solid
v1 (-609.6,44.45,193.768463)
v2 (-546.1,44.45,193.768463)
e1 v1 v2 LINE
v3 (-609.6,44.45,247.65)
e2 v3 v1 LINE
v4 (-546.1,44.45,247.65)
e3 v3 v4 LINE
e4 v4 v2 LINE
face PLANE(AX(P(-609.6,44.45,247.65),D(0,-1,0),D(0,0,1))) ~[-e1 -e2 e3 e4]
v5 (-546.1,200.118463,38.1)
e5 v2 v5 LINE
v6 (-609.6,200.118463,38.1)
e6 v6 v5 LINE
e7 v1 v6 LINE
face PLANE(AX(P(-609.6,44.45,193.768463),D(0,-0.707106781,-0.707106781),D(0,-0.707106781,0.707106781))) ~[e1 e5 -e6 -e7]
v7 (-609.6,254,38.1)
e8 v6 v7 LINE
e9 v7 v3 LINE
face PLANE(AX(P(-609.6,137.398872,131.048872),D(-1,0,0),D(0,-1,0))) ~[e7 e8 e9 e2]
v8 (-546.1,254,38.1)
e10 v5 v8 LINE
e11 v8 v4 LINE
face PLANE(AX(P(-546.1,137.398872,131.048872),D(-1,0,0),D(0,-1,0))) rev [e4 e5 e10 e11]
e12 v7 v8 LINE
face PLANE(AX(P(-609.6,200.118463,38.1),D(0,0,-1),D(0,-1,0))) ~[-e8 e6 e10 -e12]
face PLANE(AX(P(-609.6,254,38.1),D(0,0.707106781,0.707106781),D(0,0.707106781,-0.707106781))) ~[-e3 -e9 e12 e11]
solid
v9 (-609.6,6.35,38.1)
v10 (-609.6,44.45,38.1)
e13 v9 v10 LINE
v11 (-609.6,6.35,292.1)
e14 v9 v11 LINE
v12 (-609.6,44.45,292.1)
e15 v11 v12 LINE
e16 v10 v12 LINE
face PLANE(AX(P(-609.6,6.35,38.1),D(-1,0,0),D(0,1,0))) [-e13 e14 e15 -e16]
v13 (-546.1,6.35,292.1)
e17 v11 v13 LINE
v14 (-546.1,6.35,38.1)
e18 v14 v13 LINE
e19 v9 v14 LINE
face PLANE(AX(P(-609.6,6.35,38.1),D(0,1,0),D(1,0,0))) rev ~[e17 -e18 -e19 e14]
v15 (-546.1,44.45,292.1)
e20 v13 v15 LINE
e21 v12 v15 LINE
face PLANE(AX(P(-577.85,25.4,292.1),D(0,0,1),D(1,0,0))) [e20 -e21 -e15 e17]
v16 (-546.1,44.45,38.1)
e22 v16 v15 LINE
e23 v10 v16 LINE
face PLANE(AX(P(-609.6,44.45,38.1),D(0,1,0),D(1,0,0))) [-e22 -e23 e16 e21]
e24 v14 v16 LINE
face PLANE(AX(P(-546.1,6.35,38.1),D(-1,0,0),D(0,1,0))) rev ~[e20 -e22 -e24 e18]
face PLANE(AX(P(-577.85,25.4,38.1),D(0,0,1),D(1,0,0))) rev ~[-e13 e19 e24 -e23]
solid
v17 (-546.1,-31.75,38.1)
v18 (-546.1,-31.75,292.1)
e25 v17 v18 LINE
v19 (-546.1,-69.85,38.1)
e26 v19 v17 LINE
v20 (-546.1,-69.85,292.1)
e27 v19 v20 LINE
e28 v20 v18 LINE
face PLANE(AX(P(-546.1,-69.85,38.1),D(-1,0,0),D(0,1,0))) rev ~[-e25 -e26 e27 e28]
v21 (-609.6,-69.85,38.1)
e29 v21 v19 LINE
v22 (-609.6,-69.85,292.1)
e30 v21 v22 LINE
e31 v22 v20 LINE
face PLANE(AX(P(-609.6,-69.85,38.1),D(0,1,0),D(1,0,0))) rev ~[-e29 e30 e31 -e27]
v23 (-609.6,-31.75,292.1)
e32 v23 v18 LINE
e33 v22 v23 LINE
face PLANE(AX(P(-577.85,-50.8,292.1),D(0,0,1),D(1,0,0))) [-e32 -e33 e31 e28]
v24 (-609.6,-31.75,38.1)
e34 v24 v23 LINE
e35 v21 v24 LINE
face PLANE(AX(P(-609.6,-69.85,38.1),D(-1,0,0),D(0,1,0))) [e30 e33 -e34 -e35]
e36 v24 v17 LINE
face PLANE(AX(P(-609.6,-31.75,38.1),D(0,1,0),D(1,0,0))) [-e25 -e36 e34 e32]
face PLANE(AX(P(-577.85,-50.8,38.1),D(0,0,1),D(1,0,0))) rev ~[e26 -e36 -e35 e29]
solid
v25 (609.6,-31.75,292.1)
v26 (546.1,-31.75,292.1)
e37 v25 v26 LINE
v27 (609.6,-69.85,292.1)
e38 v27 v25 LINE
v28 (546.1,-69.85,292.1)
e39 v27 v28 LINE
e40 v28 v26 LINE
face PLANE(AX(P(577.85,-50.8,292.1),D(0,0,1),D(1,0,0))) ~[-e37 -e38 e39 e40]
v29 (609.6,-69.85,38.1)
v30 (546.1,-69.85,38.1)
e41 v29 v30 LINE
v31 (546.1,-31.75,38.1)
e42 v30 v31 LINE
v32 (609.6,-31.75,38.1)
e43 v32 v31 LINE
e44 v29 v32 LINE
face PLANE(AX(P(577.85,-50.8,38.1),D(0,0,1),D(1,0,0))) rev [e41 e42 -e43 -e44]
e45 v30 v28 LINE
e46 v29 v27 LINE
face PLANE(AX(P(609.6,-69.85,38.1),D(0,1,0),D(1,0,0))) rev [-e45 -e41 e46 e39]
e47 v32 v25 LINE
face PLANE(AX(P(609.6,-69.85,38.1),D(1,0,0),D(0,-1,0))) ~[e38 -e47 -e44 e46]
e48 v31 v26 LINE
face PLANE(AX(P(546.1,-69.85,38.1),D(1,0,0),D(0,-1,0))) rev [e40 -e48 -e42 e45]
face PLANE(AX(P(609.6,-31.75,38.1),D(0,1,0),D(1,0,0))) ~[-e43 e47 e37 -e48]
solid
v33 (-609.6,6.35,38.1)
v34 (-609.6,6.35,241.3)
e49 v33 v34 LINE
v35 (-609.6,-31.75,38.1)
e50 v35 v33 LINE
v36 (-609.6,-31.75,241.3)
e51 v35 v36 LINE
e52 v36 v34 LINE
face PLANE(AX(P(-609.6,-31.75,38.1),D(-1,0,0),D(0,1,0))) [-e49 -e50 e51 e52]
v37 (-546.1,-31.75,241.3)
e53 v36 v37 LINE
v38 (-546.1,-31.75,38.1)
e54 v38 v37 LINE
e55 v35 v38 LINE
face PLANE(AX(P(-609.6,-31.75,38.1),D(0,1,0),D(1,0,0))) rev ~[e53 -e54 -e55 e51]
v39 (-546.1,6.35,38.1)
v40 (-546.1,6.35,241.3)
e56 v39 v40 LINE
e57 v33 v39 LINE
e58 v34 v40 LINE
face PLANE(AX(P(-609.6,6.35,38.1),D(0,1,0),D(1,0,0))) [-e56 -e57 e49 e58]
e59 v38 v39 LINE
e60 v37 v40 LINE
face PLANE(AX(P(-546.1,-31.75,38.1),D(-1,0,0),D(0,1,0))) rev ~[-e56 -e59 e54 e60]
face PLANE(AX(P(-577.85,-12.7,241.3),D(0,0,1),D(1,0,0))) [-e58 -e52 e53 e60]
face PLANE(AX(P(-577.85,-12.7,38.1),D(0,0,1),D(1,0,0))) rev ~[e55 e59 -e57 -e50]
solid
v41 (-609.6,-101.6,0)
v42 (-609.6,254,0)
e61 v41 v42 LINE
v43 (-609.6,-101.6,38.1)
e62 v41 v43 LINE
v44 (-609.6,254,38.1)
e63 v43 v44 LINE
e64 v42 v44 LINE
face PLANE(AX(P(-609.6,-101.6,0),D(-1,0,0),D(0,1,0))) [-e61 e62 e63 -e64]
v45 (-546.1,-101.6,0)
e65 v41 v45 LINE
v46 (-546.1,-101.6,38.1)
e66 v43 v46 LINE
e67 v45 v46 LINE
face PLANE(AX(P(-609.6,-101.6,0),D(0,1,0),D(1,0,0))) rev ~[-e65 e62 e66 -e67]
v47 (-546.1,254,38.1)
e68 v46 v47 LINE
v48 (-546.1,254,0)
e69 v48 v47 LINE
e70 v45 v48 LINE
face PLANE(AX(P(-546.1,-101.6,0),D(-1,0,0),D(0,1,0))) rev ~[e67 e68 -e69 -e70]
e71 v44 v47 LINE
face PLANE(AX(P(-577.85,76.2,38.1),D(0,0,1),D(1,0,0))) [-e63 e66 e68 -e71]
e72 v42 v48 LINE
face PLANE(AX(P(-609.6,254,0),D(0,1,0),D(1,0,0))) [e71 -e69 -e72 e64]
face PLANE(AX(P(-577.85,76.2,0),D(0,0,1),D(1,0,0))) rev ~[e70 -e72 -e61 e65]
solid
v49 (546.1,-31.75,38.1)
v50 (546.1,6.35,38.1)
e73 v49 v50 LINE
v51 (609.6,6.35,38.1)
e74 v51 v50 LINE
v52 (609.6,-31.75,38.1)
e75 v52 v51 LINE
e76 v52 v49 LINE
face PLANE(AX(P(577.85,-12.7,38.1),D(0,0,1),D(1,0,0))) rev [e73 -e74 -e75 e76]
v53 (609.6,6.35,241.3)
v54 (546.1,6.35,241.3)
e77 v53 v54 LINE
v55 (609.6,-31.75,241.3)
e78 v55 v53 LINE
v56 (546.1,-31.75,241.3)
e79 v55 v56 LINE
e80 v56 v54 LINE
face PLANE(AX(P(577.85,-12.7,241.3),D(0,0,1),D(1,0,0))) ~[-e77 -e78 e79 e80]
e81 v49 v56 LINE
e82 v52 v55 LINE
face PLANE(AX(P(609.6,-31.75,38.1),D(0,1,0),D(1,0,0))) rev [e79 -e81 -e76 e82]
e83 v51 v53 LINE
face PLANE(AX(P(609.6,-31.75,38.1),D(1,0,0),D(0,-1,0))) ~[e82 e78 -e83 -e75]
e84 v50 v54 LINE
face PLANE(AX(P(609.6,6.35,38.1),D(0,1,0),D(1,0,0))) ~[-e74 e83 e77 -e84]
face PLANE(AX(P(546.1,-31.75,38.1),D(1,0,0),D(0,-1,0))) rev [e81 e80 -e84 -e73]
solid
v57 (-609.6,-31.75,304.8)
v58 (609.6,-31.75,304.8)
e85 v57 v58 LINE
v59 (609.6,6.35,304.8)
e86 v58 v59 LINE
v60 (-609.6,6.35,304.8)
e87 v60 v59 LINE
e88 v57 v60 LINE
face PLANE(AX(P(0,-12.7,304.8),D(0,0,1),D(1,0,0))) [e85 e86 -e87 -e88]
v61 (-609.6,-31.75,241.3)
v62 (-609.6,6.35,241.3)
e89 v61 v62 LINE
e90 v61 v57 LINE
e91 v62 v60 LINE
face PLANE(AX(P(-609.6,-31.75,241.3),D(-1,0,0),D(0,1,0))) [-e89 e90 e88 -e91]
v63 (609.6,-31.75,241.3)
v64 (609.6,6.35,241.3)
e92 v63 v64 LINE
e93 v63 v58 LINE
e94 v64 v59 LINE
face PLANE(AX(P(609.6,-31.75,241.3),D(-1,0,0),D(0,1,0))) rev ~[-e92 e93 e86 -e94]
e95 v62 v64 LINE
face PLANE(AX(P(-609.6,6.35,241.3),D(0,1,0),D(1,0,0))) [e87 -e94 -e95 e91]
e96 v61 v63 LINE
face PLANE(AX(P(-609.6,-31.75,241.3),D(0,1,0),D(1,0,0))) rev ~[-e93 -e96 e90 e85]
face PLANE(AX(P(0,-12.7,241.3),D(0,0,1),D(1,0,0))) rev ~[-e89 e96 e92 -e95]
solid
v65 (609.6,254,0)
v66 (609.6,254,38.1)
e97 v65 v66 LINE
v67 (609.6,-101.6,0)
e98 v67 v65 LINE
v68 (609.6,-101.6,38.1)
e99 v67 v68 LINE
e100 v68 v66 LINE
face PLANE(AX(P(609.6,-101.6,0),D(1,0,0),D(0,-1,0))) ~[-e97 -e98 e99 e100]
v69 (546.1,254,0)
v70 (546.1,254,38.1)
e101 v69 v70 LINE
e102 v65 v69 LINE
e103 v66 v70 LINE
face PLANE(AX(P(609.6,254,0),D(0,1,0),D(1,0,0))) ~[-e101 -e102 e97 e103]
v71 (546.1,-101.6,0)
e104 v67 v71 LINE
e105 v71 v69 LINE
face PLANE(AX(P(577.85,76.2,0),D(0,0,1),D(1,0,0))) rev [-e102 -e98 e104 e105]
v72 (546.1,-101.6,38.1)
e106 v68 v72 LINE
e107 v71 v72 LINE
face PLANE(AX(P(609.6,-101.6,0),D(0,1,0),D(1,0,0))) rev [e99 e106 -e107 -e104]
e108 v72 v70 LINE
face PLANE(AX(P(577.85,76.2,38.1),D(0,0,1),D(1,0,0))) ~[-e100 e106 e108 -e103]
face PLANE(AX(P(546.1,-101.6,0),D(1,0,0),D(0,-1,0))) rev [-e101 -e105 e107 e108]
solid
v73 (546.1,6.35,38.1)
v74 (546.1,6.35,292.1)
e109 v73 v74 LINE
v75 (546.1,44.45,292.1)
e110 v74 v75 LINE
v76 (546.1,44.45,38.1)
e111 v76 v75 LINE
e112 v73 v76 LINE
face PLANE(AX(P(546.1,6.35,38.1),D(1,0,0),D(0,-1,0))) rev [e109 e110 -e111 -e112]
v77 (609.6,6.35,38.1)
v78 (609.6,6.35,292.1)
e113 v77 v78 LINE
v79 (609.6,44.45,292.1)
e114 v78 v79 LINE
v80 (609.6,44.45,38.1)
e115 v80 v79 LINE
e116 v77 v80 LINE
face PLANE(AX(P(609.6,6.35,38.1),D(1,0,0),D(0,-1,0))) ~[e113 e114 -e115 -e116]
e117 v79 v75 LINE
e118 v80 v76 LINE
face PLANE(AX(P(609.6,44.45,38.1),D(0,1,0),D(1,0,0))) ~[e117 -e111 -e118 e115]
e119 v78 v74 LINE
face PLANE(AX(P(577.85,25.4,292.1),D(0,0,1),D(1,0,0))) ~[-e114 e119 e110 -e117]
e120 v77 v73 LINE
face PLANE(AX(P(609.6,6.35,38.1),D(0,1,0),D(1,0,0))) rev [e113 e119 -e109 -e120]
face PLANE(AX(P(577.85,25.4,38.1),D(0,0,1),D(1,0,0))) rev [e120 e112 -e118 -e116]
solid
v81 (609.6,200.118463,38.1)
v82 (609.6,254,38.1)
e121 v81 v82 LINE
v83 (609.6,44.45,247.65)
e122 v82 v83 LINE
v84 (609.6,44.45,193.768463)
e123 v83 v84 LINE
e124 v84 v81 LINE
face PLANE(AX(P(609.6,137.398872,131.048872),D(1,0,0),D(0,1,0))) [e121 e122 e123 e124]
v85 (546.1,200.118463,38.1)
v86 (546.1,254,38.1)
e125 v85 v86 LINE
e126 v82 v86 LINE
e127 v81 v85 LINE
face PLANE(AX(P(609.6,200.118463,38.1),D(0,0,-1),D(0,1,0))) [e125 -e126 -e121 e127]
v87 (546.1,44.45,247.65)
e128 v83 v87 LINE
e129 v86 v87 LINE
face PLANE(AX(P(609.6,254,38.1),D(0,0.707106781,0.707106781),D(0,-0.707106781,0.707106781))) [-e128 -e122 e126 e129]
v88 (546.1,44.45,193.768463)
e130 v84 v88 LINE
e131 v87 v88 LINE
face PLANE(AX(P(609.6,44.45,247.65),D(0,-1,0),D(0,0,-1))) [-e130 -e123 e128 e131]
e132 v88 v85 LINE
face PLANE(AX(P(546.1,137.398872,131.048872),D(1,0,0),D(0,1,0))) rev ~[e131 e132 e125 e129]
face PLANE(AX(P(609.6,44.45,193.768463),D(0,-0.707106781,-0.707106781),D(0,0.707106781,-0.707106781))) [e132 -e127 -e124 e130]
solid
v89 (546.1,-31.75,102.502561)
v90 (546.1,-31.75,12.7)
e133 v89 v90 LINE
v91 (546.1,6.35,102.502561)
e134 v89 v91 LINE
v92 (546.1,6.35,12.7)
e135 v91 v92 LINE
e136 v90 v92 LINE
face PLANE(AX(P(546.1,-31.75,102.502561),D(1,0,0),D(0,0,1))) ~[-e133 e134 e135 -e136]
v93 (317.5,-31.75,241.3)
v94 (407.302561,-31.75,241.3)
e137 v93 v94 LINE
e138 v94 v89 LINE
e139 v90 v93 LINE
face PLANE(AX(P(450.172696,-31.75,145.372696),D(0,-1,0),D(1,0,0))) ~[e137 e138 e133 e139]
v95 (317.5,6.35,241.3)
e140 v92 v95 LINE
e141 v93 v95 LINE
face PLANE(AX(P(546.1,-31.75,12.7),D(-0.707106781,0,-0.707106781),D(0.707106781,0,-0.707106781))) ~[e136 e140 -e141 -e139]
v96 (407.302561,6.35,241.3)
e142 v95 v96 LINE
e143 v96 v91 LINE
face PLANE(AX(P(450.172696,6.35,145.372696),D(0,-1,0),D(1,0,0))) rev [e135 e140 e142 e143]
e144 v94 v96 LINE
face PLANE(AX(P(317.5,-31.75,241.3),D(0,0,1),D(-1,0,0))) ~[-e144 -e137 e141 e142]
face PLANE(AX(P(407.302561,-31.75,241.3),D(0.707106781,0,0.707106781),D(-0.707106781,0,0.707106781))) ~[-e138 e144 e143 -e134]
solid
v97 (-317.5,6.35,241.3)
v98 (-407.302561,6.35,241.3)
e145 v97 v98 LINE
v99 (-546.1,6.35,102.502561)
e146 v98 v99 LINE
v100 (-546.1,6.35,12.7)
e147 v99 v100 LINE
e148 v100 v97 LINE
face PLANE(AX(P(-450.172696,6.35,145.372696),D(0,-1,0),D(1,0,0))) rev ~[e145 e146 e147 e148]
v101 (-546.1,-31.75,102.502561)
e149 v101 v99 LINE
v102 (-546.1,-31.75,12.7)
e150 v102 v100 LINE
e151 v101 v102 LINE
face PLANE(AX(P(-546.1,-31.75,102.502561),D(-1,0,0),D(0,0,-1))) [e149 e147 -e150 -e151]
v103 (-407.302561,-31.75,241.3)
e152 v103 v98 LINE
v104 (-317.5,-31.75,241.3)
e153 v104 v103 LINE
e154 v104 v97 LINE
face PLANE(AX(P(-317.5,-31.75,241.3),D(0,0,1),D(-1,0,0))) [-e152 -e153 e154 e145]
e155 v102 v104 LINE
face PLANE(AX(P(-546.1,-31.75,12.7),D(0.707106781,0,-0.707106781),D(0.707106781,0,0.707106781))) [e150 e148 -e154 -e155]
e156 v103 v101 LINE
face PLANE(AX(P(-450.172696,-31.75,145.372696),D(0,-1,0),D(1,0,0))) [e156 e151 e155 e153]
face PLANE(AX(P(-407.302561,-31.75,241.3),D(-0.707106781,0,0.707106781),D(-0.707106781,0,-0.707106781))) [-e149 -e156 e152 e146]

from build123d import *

# Parameters (mm, degrees)
F1_W      = 63.5
F1_H      = 355.6
F2_DEPTH  = 38.1
F3_W      = 63.5
F3_H      = 38.1
F4_DEPTH  = 203.2
F6_W      = 1219.2
F6_H      = 38.1
F7_DEPTH  = 63.5
F9_DEPTH  = 38.1
F11_W     = 63.5
F11_H     = 38.1
F12_DEPTH = 254
F15_DEPTH = 63.5


# Not quite as in the source:
# - a variable given as a bare number and used for a length is read in inches; the dataset says mm whatever the document's units were


with BuildPart() as f2:
    # F1 (on Top) → F2 (new body)
    with BuildSketch(Plane.XY):
        with Locations((-577.85, 76.2)):
            Rectangle(F1_W, F1_H)
    extrude(amount=F2_DEPTH)


with BuildPart() as f4:
    # F3 (on face) → F4 (new body)
    with BuildSketch(Plane.XY.offset(38.1)):
        with Locations((-577.85, -12.7)):
            Rectangle(F3_W, F3_H)
    extrude(amount=F4_DEPTH)


with BuildPart() as f5_1:
    # F5: instance of F4
    add(f4.part.mirror(Plane.YZ))


with BuildPart() as f5_2:
    # F5: instance of F2
    add(f2.part.mirror(Plane.YZ))


with BuildPart() as f7:
    # F6 (on face) → F7 (new body)
    with BuildSketch(Plane.XY.offset(241.3)):
        with Locations((0, -12.7)):
            Rectangle(F6_W, F6_H)
    extrude(amount=F7_DEPTH)


with BuildPart() as f9:
    # F8 (on face) → F9 (new body)
    with BuildSketch(Plane.XZ.offset(31.75)):
        Polygon((-407.3025612107, 241.3), (-546.1, 102.5025612107), (-546.1, 12.7), (-317.5, 241.3), align=None)
    extrude(amount=-F9_DEPTH)


with BuildPart() as f10_1:
    # F10: instance of F9
    add(f9.part.mirror(Plane.YZ))


with BuildPart() as f12:
    # F11 (on face) → F12 (new body)
    with BuildSketch(Plane.XY.offset(38.1)):
        with Locations((-577.85, -50.8)):
            Rectangle(F11_W, F11_H)
    extrude(amount=F12_DEPTH)


with BuildPart() as f12b:
    # F11 (on face) → F12, piece 2 (new body)
    with BuildSketch(Plane.XY.offset(38.1)):
        with Locations((-577.85, 25.4)):
            Rectangle(F11_W, F11_H)
    extrude(amount=F12_DEPTH)


with BuildPart() as f13_1:
    # F13: instance of F12b
    add(f12b.part.mirror(Plane.YZ))


with BuildPart() as f13_2:
    # F13: instance of F12
    add(f12.part.mirror(Plane.YZ))


with BuildPart() as f15:
    # F14 (on face) → F15 (new body)
    with BuildSketch(Plane.YZ.offset(609.6)):
        Polygon((44.45, 193.7684632736), (200.1184632736, 38.1), (254, 38.1), (44.45, 247.65), align=None)
    extrude(amount=-F15_DEPTH)


with BuildPart() as f16_1:
    # F16: instance of F15
    add(f15.part.mirror(Plane.YZ))


solid = Compound([f2.part, f4.part, f5_1.part, f5_2.part, f7.part, f9.part, f10_1.part, f12.part, f12b.part, f13_1.part, f13_2.part, f15.part, f16_1.part])
